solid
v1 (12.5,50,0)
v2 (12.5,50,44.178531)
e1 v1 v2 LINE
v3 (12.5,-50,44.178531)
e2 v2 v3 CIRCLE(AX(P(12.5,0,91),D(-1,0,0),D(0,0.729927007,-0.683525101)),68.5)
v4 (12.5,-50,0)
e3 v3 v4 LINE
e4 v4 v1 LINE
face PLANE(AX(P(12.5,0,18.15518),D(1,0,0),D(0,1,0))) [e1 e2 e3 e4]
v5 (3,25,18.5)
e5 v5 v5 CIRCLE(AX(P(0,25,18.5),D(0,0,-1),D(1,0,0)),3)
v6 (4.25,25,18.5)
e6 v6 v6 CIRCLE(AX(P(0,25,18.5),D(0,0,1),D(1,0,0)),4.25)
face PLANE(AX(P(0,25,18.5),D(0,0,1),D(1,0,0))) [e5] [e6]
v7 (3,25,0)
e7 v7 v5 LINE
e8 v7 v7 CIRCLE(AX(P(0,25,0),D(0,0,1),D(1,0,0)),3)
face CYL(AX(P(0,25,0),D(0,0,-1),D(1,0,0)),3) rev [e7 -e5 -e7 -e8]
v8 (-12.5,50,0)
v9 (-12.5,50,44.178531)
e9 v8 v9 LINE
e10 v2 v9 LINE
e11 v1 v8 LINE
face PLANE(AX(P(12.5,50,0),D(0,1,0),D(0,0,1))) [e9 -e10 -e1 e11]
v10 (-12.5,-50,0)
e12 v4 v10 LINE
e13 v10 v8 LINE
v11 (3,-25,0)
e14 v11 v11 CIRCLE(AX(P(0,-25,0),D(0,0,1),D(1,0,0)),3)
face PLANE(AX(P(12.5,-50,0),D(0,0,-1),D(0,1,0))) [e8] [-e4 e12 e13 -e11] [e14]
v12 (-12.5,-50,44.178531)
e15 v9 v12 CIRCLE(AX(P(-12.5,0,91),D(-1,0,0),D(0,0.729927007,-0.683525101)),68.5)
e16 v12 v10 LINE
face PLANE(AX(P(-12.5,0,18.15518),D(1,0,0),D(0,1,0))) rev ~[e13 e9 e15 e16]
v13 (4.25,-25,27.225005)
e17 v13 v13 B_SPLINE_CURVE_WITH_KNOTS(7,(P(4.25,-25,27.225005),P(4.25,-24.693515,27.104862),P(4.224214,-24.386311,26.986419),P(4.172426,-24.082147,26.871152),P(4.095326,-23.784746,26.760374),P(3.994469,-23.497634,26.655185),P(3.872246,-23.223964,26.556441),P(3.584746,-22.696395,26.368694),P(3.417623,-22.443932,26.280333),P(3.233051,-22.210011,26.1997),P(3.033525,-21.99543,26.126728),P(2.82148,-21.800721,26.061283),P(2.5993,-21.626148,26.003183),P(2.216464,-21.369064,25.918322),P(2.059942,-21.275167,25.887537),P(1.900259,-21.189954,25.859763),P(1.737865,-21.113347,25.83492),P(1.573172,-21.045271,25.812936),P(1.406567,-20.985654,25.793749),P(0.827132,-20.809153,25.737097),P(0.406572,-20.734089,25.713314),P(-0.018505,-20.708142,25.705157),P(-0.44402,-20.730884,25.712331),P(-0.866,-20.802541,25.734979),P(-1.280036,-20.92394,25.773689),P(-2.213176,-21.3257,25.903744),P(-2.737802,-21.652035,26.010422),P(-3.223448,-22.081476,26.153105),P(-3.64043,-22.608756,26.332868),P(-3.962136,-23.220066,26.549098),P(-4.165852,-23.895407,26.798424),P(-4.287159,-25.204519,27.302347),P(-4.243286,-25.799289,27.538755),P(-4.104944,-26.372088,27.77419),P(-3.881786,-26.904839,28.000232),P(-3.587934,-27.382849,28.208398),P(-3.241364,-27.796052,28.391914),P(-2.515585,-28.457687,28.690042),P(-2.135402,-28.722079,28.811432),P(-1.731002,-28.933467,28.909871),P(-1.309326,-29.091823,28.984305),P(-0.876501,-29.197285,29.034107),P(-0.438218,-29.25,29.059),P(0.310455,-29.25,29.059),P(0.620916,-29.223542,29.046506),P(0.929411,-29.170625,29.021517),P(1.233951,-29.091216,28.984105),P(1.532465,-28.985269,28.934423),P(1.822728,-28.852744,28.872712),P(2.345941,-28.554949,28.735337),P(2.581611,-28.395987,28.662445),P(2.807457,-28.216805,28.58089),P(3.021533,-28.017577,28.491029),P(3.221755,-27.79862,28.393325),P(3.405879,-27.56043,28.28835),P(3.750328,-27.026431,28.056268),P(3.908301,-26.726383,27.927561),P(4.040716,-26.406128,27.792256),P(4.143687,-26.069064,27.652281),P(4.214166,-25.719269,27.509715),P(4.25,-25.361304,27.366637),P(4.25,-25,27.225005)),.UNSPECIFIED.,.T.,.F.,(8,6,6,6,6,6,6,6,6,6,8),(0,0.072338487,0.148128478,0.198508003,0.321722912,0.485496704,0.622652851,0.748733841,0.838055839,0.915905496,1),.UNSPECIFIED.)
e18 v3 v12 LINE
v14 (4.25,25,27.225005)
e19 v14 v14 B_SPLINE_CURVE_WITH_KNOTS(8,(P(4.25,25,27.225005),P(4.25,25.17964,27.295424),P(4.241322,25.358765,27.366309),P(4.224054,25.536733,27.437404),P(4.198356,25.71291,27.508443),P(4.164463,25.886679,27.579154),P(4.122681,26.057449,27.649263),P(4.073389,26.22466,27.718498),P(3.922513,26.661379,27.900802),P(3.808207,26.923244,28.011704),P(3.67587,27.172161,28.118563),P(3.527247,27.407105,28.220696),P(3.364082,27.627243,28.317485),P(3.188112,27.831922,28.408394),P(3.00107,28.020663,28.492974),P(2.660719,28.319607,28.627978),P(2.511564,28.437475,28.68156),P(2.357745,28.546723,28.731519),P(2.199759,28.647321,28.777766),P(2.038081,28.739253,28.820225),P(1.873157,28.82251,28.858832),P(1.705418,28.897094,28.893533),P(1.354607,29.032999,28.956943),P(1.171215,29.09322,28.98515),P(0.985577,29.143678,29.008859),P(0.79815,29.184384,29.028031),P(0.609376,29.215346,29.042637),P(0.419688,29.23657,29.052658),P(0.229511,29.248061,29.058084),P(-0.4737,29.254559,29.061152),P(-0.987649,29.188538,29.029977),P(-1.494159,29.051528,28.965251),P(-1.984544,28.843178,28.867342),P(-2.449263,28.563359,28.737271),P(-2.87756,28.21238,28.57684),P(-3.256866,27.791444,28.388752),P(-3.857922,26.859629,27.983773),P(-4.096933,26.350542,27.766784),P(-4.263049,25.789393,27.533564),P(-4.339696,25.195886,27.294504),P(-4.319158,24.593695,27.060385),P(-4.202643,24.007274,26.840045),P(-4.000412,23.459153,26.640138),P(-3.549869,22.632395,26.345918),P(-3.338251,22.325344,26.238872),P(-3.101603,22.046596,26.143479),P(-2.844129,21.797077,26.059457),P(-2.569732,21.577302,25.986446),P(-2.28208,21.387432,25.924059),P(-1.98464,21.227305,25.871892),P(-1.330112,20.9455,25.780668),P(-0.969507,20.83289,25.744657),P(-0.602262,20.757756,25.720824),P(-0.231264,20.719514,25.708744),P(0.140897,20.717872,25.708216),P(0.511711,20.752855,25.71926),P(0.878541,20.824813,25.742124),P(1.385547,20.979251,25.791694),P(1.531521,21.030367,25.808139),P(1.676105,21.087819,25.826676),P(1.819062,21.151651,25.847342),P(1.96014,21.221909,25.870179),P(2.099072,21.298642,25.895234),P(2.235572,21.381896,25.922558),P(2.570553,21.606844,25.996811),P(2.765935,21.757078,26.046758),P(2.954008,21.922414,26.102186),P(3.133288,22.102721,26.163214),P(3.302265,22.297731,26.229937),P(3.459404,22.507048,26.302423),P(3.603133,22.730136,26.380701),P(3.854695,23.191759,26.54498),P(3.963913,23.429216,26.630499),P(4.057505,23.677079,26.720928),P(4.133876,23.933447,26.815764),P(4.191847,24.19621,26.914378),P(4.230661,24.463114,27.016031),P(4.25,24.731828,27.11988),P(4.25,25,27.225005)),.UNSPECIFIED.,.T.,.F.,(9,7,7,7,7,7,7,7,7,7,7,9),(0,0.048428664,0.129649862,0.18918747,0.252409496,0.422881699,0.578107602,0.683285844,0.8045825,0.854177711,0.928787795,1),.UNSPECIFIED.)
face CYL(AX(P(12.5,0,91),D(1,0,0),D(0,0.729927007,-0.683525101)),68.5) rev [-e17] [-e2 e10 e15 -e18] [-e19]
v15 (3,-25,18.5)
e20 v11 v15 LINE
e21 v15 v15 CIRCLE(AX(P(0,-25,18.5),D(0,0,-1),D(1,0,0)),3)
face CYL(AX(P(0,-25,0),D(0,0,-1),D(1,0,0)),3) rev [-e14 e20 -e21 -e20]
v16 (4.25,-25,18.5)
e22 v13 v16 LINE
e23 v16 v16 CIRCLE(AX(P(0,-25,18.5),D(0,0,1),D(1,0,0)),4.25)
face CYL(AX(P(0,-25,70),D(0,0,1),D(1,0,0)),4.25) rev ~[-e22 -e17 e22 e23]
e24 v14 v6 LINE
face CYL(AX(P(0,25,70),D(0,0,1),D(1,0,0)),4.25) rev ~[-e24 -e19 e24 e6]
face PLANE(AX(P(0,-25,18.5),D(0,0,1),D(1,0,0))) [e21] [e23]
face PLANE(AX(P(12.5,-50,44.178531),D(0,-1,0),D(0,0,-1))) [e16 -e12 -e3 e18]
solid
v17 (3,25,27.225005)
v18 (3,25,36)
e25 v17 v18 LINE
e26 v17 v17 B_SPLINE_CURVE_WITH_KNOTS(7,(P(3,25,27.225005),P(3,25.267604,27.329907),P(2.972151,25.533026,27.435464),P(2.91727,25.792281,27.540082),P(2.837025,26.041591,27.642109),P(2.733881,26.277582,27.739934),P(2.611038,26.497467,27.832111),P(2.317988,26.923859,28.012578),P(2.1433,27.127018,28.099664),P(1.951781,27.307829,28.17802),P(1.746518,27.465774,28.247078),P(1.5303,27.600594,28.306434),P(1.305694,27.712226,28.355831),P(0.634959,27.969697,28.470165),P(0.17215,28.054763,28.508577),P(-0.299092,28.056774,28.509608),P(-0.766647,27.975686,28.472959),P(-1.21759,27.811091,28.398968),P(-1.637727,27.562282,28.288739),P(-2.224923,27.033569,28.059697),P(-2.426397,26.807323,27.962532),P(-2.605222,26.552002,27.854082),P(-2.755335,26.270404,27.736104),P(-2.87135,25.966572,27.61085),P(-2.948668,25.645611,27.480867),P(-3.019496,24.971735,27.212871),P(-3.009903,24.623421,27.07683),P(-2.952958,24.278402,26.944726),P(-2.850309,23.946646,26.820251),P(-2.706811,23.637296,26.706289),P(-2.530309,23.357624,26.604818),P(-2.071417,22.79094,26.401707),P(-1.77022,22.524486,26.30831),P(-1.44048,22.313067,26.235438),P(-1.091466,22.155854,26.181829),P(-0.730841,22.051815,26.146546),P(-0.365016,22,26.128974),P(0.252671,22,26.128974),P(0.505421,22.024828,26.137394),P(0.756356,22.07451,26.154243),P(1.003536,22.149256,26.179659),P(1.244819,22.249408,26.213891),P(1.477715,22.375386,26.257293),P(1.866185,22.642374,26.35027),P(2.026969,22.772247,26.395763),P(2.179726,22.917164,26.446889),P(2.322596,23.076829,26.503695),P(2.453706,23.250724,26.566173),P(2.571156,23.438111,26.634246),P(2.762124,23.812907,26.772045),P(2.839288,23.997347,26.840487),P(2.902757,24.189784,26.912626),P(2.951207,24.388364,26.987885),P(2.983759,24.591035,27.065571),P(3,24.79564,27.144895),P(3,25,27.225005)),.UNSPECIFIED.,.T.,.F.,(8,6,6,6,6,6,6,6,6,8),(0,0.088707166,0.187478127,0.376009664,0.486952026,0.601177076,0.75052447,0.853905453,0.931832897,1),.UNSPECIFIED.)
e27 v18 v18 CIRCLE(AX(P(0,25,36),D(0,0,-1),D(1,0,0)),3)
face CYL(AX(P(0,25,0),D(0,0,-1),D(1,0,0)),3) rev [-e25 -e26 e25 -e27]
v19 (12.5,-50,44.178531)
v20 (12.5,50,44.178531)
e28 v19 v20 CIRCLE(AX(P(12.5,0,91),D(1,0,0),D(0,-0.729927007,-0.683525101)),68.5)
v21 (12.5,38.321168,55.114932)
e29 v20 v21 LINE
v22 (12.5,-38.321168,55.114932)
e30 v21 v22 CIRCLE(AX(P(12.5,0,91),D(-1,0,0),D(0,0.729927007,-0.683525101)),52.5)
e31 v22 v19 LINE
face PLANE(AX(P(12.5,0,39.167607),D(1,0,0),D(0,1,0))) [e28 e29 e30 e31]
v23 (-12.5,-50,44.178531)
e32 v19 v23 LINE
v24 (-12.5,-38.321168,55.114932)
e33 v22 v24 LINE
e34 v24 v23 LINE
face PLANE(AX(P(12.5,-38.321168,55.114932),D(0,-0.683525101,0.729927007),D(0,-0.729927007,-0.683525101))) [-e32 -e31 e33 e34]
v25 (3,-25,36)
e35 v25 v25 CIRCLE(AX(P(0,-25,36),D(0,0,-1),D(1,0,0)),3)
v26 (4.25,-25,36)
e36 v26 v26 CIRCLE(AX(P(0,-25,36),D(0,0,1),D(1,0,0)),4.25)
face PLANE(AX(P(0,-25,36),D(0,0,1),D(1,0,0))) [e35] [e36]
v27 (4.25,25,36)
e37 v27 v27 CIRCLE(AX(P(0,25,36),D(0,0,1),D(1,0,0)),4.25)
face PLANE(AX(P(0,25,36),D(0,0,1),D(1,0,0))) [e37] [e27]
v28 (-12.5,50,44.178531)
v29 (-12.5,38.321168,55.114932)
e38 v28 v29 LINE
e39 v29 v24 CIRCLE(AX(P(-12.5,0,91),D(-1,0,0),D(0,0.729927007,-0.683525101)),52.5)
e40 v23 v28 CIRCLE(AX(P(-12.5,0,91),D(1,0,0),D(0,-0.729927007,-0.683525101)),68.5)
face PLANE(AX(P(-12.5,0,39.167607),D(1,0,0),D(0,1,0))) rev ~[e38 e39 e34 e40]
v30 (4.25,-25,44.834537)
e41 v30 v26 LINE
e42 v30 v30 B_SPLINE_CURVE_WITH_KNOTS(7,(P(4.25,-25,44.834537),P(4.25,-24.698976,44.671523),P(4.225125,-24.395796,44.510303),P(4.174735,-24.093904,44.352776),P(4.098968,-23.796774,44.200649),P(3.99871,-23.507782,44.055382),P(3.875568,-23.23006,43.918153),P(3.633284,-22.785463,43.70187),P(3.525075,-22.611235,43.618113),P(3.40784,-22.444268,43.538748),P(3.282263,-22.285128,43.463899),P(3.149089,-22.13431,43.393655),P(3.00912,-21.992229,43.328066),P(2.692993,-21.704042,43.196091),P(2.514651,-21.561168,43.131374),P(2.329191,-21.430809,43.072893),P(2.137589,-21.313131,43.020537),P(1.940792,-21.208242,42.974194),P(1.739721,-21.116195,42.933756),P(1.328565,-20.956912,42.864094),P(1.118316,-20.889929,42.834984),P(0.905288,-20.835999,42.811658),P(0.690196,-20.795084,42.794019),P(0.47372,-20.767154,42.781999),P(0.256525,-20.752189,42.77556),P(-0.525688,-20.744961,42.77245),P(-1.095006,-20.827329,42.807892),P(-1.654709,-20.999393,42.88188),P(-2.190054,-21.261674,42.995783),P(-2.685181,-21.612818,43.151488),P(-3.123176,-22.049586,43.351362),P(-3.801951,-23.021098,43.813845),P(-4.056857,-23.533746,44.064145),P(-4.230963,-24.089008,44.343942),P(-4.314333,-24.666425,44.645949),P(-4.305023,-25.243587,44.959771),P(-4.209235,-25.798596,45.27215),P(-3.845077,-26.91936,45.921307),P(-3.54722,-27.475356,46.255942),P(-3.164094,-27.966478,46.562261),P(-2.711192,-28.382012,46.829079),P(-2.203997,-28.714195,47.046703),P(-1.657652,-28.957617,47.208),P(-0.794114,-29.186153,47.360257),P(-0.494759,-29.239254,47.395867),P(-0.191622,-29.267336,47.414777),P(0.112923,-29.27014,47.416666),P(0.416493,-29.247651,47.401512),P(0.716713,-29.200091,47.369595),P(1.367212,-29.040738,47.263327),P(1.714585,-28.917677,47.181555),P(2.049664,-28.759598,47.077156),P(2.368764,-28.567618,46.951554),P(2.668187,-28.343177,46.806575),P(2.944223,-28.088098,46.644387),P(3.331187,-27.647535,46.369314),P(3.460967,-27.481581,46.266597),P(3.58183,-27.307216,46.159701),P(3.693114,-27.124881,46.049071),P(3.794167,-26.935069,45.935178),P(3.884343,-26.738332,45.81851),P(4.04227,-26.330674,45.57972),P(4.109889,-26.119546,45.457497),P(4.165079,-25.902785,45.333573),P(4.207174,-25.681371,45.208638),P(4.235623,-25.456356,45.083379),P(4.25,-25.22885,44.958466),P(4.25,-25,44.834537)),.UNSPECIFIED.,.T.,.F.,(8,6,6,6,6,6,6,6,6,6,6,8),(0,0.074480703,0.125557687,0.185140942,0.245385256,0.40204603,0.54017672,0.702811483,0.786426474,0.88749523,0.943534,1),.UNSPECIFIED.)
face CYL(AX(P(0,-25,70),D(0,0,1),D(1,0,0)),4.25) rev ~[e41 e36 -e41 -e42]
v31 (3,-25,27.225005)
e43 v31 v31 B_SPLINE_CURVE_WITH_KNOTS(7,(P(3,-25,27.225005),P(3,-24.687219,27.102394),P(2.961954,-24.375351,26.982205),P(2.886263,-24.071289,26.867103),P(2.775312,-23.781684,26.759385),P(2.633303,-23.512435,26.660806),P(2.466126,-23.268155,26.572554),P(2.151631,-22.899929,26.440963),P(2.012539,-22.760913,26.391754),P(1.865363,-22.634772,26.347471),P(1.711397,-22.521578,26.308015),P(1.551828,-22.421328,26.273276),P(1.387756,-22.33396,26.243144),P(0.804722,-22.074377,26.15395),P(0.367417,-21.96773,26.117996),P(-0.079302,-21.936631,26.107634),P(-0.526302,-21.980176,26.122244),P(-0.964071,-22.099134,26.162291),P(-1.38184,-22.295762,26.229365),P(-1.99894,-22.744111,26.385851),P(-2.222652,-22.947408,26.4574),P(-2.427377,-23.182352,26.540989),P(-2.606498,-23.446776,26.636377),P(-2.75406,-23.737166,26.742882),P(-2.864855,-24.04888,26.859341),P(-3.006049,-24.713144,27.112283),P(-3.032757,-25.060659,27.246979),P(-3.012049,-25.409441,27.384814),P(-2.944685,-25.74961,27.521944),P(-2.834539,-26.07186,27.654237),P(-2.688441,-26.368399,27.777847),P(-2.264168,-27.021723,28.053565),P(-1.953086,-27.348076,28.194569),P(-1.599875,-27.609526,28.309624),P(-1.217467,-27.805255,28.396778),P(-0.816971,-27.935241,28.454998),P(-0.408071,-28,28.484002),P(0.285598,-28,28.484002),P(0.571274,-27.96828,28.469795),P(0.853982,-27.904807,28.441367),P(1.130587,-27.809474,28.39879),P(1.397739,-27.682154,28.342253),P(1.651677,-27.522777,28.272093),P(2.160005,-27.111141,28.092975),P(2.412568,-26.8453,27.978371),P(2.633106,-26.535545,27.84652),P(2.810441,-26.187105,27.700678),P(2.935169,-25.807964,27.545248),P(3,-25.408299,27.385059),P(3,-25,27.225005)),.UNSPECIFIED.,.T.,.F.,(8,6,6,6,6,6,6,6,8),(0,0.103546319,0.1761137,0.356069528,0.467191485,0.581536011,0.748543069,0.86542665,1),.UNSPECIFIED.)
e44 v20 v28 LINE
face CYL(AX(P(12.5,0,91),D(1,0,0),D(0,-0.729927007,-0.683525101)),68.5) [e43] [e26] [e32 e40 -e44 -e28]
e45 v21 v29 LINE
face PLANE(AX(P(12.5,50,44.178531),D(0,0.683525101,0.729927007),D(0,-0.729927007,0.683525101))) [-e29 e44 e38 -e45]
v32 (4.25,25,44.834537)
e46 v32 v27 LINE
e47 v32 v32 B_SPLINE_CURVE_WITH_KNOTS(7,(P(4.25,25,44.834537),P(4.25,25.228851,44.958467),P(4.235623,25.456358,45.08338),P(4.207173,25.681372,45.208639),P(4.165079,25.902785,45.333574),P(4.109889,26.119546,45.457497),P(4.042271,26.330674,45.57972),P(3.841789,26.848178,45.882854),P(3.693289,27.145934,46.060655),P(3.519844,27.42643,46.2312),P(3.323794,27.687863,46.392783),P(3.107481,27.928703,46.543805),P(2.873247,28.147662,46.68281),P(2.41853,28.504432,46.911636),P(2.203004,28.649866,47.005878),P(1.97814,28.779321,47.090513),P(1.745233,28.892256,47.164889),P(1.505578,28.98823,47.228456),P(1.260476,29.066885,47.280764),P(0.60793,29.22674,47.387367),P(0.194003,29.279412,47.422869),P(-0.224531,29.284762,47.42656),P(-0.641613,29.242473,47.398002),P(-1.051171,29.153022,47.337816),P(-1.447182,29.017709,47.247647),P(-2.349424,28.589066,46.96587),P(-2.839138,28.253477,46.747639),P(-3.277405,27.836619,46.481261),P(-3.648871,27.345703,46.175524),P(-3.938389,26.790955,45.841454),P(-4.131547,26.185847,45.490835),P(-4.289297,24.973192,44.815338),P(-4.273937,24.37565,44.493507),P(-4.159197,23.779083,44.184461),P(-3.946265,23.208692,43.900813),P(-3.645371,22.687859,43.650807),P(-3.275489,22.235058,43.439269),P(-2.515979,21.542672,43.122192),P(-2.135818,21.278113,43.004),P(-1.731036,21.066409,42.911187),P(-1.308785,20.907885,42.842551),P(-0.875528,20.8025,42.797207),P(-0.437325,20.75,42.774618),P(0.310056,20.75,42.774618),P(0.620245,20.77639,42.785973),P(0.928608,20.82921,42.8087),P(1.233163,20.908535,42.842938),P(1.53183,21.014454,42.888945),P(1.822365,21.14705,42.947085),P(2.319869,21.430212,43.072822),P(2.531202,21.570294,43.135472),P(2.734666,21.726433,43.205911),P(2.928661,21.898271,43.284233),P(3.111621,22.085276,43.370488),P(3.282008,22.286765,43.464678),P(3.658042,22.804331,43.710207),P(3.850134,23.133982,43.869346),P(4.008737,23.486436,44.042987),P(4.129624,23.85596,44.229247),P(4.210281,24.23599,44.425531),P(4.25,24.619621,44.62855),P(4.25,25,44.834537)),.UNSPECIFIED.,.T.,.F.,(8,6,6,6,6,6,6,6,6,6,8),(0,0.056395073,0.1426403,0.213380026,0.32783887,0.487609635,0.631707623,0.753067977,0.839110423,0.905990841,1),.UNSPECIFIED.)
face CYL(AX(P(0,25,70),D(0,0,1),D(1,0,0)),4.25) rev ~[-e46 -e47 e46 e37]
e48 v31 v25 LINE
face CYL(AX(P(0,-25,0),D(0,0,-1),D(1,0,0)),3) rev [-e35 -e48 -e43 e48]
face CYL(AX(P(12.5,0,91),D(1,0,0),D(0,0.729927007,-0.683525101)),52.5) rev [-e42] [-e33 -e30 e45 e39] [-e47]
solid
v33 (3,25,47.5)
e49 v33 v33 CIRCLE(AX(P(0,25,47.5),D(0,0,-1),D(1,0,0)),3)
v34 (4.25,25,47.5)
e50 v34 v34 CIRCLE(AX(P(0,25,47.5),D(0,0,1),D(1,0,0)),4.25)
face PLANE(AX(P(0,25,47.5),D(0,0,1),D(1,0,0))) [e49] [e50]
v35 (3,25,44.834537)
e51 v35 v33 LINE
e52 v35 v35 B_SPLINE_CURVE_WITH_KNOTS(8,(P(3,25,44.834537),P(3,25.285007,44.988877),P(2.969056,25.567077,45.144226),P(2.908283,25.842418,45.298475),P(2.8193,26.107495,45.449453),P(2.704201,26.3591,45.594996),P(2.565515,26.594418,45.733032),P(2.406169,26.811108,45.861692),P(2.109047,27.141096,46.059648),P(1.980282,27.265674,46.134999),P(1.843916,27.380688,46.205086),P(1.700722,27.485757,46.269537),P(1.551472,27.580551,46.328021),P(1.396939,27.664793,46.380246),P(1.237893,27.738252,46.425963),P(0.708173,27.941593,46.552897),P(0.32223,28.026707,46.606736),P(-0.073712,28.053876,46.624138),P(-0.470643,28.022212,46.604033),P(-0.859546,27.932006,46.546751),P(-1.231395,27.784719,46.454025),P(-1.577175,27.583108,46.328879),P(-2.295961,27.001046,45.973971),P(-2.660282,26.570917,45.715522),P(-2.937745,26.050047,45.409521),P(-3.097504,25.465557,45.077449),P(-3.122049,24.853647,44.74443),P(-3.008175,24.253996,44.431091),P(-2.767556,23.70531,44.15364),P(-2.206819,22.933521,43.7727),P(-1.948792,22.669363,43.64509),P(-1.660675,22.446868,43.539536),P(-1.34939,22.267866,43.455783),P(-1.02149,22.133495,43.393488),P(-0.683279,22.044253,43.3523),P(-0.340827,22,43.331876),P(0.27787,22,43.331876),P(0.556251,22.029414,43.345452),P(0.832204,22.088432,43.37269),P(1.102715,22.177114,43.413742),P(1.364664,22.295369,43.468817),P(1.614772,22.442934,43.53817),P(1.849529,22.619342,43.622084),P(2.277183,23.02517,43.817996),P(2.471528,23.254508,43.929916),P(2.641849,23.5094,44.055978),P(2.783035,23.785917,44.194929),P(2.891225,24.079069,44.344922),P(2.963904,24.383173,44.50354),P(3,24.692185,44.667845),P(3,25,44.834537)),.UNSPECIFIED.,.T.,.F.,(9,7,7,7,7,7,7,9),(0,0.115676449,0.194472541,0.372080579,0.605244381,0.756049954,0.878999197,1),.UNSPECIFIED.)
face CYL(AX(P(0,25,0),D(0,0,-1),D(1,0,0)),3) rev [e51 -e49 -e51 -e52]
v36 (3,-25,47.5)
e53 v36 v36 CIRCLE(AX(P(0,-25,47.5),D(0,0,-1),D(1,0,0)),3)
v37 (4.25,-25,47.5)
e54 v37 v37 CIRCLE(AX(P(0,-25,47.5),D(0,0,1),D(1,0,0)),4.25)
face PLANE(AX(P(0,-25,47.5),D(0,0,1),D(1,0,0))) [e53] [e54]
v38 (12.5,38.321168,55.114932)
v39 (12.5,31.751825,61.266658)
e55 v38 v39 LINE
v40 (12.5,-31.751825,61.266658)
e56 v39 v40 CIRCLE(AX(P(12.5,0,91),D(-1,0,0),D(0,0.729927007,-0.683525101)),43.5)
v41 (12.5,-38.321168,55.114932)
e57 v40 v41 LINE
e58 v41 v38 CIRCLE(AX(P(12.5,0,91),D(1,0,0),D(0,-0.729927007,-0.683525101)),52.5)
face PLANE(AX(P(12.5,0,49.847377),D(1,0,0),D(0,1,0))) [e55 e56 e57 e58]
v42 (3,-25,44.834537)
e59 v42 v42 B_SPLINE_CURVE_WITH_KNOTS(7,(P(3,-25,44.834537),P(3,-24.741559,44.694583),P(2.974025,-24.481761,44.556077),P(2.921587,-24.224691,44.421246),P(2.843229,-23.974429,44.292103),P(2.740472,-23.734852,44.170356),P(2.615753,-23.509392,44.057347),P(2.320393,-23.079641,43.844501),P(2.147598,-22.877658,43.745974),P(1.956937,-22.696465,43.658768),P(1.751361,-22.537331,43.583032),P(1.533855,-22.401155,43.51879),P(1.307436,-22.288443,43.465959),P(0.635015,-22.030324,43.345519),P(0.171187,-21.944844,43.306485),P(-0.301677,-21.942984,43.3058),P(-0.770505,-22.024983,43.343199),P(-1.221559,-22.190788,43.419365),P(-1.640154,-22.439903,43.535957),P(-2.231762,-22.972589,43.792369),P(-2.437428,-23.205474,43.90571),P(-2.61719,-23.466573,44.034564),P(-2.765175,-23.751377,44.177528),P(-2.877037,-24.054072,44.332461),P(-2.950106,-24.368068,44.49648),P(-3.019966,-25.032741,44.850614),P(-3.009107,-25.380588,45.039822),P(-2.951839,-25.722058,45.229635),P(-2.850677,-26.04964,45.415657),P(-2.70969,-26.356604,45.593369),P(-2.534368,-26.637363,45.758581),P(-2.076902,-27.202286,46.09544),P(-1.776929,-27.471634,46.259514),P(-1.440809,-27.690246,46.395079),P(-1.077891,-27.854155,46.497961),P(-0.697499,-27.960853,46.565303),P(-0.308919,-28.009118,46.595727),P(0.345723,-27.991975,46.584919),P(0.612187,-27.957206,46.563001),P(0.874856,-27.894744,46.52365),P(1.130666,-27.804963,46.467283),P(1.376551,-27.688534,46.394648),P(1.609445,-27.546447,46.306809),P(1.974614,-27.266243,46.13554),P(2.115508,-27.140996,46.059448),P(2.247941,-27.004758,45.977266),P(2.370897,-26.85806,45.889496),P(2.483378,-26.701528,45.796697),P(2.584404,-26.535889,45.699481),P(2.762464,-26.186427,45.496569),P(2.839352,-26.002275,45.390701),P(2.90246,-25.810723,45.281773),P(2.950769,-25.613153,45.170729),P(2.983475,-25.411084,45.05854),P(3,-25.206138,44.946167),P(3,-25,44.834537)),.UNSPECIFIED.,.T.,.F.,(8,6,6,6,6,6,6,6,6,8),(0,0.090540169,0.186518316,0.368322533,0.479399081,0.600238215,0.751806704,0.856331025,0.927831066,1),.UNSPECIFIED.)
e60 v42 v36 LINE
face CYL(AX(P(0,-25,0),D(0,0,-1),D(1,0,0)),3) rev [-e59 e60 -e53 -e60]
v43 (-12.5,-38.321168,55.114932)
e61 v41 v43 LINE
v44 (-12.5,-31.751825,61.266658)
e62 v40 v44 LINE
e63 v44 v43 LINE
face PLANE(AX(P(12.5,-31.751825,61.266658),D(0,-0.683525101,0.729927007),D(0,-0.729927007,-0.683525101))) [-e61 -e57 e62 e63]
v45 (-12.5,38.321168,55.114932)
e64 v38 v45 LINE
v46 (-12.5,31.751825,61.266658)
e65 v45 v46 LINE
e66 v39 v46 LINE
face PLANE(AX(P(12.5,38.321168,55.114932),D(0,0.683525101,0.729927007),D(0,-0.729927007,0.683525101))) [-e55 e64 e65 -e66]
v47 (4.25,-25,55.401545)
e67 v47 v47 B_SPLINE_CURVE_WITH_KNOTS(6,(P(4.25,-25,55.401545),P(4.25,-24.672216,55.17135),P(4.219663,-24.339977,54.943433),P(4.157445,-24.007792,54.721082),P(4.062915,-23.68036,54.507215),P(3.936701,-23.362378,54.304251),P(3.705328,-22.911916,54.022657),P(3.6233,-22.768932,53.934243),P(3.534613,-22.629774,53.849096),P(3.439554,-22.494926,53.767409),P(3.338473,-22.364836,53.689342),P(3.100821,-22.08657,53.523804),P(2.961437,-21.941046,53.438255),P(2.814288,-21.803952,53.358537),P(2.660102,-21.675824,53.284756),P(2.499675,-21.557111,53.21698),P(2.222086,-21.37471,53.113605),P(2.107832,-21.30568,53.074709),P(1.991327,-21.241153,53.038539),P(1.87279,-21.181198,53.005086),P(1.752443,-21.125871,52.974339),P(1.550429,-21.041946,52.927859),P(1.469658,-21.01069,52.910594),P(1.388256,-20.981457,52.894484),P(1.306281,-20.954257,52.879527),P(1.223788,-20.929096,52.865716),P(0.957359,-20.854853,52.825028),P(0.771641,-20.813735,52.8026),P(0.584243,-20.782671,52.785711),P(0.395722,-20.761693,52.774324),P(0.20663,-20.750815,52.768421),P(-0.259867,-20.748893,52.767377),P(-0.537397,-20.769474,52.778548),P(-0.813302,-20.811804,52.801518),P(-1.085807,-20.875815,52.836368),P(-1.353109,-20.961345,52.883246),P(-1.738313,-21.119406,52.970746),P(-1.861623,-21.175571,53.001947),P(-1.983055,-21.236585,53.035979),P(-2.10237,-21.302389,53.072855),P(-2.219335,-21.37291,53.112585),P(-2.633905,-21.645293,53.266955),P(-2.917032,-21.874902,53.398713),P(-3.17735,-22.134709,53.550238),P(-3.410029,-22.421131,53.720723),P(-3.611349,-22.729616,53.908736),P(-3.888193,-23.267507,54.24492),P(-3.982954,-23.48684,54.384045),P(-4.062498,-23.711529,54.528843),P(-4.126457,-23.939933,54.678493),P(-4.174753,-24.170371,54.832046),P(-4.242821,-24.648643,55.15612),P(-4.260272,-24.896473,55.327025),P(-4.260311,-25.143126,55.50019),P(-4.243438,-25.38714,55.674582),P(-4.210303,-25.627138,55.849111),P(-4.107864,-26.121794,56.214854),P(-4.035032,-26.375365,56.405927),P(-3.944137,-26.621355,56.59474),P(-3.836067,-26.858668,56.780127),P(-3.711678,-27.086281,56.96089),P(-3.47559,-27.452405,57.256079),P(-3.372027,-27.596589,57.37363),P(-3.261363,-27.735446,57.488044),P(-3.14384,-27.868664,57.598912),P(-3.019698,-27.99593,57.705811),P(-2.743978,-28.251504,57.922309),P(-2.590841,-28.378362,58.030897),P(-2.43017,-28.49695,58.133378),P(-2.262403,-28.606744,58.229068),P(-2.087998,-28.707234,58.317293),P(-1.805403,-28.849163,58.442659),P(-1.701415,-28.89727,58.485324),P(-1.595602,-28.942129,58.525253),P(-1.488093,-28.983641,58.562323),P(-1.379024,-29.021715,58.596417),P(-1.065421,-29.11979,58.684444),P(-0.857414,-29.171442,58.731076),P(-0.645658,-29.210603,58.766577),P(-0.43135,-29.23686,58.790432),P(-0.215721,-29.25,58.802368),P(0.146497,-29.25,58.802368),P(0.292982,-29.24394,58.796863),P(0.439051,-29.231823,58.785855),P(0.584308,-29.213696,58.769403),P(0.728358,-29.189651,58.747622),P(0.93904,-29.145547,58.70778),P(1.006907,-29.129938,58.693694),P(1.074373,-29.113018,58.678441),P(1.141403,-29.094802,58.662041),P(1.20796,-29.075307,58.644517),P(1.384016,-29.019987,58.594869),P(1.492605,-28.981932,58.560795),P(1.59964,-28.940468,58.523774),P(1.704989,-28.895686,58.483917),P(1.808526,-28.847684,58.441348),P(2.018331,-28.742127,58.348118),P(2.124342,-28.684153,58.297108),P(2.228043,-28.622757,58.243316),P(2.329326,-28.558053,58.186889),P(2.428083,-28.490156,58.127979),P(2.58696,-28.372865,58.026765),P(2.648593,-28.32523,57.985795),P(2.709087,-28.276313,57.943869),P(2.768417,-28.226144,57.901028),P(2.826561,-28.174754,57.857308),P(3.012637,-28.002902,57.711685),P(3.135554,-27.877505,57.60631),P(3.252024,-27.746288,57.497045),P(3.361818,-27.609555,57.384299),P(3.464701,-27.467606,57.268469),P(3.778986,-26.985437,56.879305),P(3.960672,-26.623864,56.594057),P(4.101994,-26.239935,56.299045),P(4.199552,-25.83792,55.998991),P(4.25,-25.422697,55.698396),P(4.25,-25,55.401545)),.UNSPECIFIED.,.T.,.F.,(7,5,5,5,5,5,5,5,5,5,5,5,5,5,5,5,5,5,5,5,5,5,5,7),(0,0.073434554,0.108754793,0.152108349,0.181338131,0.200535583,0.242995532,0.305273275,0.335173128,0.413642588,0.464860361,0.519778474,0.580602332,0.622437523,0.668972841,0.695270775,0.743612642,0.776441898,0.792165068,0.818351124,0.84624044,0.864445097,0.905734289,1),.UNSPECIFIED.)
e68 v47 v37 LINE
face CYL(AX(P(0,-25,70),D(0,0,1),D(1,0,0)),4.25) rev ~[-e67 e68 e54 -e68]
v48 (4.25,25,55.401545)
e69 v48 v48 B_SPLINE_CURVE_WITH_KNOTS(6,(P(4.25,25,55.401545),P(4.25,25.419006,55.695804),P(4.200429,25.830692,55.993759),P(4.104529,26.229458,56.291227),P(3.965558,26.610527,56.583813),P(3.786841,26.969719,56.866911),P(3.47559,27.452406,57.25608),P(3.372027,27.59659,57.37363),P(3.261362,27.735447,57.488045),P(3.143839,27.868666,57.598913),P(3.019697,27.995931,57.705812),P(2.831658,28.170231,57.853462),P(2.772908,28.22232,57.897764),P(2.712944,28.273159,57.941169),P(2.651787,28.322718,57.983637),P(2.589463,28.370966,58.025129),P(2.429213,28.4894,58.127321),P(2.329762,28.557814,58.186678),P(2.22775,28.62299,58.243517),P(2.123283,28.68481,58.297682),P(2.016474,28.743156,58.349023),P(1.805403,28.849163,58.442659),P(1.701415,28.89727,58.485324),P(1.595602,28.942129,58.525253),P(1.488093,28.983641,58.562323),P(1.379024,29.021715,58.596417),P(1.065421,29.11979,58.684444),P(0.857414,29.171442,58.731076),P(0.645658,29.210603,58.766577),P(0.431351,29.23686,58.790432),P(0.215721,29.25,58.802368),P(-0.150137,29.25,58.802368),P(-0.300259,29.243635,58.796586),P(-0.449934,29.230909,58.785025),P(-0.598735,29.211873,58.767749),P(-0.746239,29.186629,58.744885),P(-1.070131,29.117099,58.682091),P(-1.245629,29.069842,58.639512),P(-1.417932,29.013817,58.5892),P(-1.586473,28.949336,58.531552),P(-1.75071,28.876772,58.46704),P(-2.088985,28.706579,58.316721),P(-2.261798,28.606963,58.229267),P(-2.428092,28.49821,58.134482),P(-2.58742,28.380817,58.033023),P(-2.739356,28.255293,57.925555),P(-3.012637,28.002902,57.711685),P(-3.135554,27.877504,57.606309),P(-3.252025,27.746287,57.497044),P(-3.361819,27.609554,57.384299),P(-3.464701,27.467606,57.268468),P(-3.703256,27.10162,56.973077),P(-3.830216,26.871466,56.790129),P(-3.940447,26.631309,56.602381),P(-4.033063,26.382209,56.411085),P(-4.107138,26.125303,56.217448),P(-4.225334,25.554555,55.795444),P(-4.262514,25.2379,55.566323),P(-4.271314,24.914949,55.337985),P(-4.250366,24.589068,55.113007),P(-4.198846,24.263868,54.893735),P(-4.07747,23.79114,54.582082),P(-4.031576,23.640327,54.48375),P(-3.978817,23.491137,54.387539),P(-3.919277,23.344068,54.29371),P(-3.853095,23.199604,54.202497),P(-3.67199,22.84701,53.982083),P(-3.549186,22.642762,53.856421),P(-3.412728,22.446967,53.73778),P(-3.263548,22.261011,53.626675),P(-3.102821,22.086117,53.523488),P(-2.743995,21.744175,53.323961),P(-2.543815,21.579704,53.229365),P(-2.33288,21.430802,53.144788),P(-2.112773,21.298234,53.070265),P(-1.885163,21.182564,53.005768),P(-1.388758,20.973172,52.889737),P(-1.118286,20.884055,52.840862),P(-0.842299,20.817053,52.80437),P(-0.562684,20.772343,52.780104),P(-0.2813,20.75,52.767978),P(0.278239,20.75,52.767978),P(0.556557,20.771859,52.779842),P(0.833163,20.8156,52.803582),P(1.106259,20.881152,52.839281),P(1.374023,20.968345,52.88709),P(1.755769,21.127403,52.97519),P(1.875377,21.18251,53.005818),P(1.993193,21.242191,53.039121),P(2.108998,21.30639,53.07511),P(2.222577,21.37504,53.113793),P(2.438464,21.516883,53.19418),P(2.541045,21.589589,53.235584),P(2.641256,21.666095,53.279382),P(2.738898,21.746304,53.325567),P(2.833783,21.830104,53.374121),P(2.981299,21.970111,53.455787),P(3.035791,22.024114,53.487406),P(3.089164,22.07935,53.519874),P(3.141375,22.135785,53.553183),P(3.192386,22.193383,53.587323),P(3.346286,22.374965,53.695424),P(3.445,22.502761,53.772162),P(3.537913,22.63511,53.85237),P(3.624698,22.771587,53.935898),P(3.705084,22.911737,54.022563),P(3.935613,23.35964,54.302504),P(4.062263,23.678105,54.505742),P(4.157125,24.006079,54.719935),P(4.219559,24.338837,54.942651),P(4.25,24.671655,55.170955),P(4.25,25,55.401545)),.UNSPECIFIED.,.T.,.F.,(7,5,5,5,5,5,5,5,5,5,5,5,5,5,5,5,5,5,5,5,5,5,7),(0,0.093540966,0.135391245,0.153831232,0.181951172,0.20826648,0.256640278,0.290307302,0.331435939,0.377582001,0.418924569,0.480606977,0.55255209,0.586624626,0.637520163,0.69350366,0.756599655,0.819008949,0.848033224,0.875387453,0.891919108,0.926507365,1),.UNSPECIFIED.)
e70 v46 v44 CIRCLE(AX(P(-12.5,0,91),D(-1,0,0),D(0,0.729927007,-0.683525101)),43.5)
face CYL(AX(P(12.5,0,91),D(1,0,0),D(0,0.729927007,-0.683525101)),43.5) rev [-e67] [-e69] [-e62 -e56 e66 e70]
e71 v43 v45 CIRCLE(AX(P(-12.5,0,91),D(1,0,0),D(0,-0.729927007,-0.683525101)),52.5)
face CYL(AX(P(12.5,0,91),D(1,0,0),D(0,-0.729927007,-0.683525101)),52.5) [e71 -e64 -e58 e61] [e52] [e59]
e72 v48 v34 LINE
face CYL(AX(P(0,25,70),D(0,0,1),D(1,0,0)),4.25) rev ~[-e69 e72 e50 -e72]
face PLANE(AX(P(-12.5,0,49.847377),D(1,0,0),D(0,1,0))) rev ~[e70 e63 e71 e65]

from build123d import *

# Parameters (mm, degrees)
F3_DEPTH  = 25
F4_DEPTH  = 25
F5_DEPTH  = 25
F0_R      = 3
F6_DEPTH  = 61.2676580964
F8_R      = 4.25
F9_DEPTH  = 22.5
F10_DEPTH = 34
F11_DEPTH = 51.5


with BuildPart() as f3:
    # F2 (on plane+point) → F3 (new body)
    with BuildSketch(Plane.YZ.offset(12.5)):
        with BuildLine():
            Line((-50, 0), (50, 0))
            Line((50, 0), (50, 44.1785305656))
            ThreePointArc((50, 44.1785305656), (0, 22.5), (-50, 44.1785305656))
            Line((-50, 44.1785305656), (-50, 0))
        make_face()
    extrude(amount=-F3_DEPTH)


with BuildPart() as f4:
    # F2 (on plane+point) → F4 (new body)
    with BuildSketch(Plane.YZ.offset(12.5)):
        with BuildLine():
            ThreePointArc((-50, 44.1785305656), (0, 22.5), (50, 44.1785305656))
            Line((50, 44.1785305656), (38.3211678832, 55.1149321853))
            ThreePointArc((38.3211678832, 55.1149321853), (0, 38.5), (-38.3211678832, 55.1149321853))
            Line((-38.3211678832, 55.1149321853), (-50, 44.1785305656))
        make_face()
    extrude(amount=-F4_DEPTH)


with BuildPart() as f5:
    # F2 (on plane+point) → F5 (new body)
    with BuildSketch(Plane.YZ.offset(12.5)):
        with BuildLine():
            ThreePointArc((-38.3211678832, 55.1149321853), (0, 38.5), (38.3211678832, 55.1149321853))
            Line((38.3211678832, 55.1149321853), (31.7518248175, 61.2666580964))
            ThreePointArc((31.7518248175, 61.2666580964), (0, 47.5), (-31.7518248175, 61.2666580964))
            Line((-31.7518248175, 61.2666580964), (-38.3211678832, 55.1149321853))
        make_face()
    extrude(amount=-F5_DEPTH)


with BuildPart() as f6_tool:
    # F0 (on Top) → F6 (new body, through all)
    with BuildSketch(Plane.XY):
        with Locations((0, -25)):
            Circle(F0_R)
        with Locations((0, 25)):
            Circle(F0_R)
    extrude(amount=F6_DEPTH)


with BuildPart() as f3_1:
    add(f3.part)

    # F6: cut by f6_tool
    add(f6_tool.part, mode=Mode.SUBTRACT)

    # F8 (on offset) → F11 (cut)
    with BuildSketch(Plane.XY.offset(70)):
        with Locations((0, 25)):
            Circle(F8_R)
        with Locations((0, -25)):
            Circle(F8_R)
    extrude(amount=-F11_DEPTH, mode=Mode.SUBTRACT)


with BuildPart() as f4_1:
    add(f4.part)

    # F6: cut by f6_tool
    add(f6_tool.part, mode=Mode.SUBTRACT)

    # F8 (on offset) → F10 (cut)
    with BuildSketch(Plane.XY.offset(70)):
        with Locations((0, -25)):
            Circle(F8_R)
        with Locations((0, 25)):
            Circle(F8_R)
    extrude(amount=-F10_DEPTH, mode=Mode.SUBTRACT)


with BuildPart() as f5_1:
    add(f5.part)

    # F6: cut by f6_tool
    add(f6_tool.part, mode=Mode.SUBTRACT)

    # F8 (on offset) → F9 (cut)
    with BuildSketch(Plane.XY.offset(70)):
        with Locations((0, -25)):
            Circle(F8_R)
        with Locations((0, 25)):
            Circle(F8_R)
    extrude(amount=-F9_DEPTH, mode=Mode.SUBTRACT)


solid = Compound([f3_1.part, f4_1.part, f5_1.part])
